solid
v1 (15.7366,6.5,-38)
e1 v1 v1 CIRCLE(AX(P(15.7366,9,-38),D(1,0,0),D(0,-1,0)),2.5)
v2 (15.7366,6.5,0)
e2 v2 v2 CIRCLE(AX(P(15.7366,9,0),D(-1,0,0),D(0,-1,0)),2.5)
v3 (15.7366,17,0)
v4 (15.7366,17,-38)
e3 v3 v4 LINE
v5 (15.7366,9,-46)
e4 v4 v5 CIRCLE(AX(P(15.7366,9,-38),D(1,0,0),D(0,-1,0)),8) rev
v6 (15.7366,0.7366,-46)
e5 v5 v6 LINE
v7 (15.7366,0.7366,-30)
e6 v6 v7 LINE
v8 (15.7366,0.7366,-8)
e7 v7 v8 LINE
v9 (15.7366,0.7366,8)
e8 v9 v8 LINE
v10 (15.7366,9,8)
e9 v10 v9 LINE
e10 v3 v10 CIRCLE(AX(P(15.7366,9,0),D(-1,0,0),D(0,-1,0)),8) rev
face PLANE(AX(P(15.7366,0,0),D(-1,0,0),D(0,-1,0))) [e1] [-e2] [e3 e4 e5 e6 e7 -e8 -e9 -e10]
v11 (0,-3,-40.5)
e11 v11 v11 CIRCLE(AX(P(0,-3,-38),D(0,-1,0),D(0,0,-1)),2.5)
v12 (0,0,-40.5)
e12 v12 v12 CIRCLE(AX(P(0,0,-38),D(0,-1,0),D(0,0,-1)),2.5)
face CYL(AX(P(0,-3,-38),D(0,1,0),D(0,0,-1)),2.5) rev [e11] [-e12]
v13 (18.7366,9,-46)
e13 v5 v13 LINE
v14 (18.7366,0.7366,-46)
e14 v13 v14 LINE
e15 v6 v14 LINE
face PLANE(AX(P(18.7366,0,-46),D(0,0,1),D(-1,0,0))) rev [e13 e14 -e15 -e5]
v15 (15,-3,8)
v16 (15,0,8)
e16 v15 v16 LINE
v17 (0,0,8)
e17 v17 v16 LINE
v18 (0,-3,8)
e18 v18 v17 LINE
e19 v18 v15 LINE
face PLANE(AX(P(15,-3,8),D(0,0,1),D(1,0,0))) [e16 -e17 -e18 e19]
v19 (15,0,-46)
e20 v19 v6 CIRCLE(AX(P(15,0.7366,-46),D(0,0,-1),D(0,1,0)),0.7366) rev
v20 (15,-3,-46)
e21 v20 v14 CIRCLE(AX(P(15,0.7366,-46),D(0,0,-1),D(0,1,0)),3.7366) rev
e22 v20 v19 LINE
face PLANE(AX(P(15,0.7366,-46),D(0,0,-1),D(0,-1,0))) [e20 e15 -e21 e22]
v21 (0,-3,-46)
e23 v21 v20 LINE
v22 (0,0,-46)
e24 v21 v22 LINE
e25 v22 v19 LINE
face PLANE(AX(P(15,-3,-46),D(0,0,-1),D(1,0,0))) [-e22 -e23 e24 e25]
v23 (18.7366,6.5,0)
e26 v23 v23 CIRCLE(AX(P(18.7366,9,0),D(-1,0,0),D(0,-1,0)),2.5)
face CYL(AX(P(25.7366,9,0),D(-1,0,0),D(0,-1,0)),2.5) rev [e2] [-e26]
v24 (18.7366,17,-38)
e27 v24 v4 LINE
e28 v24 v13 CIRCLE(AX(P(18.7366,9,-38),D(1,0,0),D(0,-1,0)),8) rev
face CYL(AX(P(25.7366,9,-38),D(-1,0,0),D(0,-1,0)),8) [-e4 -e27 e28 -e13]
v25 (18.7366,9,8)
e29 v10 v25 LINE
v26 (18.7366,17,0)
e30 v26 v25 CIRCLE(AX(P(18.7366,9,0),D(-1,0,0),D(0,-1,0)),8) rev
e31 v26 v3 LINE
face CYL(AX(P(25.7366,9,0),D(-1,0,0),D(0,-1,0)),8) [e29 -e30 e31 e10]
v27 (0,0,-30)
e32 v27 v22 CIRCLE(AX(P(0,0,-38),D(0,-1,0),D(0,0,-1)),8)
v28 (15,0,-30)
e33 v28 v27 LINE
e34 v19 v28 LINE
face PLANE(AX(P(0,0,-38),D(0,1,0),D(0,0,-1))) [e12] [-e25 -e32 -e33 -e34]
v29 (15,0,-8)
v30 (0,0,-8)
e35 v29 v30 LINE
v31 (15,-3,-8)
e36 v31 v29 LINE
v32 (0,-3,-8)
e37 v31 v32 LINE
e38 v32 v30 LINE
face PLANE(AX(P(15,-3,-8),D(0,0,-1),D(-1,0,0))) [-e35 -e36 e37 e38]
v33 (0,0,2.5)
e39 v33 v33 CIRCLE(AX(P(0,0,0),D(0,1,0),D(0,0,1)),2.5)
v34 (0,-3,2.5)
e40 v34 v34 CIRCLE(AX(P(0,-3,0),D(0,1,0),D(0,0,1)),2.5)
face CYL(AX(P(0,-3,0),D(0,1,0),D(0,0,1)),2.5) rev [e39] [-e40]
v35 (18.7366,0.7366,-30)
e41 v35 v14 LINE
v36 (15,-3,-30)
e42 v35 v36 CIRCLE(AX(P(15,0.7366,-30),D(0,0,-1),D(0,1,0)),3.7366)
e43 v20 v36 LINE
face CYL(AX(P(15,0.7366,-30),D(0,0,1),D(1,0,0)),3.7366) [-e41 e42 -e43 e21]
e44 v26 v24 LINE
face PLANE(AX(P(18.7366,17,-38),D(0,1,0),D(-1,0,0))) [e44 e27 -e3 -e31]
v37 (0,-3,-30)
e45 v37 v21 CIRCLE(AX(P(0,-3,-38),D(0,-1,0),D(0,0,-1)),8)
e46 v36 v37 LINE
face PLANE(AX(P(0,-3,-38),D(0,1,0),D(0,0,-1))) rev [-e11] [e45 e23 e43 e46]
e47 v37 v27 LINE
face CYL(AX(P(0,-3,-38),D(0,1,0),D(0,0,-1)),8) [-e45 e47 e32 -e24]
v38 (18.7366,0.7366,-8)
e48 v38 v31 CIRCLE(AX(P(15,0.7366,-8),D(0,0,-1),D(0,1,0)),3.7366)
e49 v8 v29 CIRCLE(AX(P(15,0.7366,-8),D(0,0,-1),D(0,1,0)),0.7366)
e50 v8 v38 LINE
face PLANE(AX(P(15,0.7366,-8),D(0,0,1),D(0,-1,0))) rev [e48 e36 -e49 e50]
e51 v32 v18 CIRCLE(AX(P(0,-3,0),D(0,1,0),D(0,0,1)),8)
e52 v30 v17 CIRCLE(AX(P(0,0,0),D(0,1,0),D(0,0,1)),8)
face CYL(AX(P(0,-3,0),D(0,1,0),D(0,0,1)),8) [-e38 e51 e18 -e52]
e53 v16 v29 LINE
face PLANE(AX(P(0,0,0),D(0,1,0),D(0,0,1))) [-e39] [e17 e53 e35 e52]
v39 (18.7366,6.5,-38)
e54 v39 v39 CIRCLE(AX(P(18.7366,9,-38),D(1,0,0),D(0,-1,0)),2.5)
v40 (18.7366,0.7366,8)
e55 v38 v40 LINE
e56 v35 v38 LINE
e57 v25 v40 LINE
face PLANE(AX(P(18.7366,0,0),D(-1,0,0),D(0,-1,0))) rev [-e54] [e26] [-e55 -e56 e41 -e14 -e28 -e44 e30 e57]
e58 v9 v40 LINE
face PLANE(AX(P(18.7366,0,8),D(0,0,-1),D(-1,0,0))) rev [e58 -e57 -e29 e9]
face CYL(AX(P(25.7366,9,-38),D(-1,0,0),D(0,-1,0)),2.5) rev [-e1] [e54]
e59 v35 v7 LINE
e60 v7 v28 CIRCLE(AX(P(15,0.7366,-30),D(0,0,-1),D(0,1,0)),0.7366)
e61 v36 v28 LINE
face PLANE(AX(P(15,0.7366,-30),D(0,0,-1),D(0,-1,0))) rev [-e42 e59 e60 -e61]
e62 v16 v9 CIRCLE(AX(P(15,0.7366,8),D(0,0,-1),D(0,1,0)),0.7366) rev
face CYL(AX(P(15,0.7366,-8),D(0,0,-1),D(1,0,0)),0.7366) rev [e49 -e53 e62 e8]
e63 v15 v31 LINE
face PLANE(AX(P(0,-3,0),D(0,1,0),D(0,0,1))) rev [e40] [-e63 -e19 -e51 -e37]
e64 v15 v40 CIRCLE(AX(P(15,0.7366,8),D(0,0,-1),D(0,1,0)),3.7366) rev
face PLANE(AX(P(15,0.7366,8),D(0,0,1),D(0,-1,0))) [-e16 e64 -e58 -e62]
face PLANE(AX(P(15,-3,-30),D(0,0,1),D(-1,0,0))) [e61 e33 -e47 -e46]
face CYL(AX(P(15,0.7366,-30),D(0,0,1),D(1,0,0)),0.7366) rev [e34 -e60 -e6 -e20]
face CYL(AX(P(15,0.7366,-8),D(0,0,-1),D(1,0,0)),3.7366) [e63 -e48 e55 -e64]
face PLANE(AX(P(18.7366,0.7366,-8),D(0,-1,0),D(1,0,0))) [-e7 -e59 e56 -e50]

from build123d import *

# Parameters (mm, degrees)
SKETCH1_R          = 2.5
BASE_FLANGE1_DEPTH = 3
EDGE_FLANGE1_DEPTH = 16
SKETCH10_R         = 2.5
CUT_EXTRUDE1_DEPTH = 10
TAB1_START         = -3
TAB1_DEPTH         = 3


# Read off the part's stored shape, not the designer's step: Tab1
# Sheet-metal steps are written as plain solids
with BuildPart() as part:
    # Sketch1 → Base-Flange1 (new body)
    with BuildSketch(Plane(origin=(0, 0, 0), x_dir=(1, 0, 0), z_dir=(0, 1, 0))):
        with BuildLine():
            Line((15, -8), (0, -8))
            ThreePointArc((0, -8), (-8, 0), (0, 8))
            Line((0, 8), (15, 8))
            Line((15, 8), (15, -8))
        make_face()
        with Locations(Location((0, 0, 0), (0, 0, 270))):
            Circle(SKETCH1_R, mode=Mode.SUBTRACT)
    extrude(amount=-BASE_FLANGE1_DEPTH)

    # Edge-Flange1 section (across the edge) → Edge-Flange1 (add)
    with BuildSketch(Plane(origin=(15.7366, 0, 8), x_dir=(-1, 0, 0), z_dir=(0, 0, -1))):
        with BuildLine():
            Line((-3, 0.7366), (-3, 17))
            Line((-3, 17), (0, 17))
            Line((0, 17), (0, 0.7366))
            ThreePointArc((0, 0.7366), (0.215745145, 0.215745145), (0.7366, 0))
            Line((0.7366, 0), (0.7366, -3))
            ThreePointArc((0.7366, -3), (-1.905575199, -1.905575199), (-3, 0.7366))
        make_face()
    extrude(amount=EDGE_FLANGE1_DEPTH)

    # Sketch10 → Cut-Extrude1 (cut)
    with BuildSketch(Plane.ZY.offset(-15.7366)):
        with BuildLine():
            Line((-8, 17), (-8, 9))
            ThreePointArc((-8, 9), (-5.656854249, 14.656854249), (0, 17))
            Line((0, 17), (-8, 17))
        make_face()
        with BuildLine():
            Line((8, 17), (0, 17))
            ThreePointArc((0, 17), (5.656854249, 14.656854249), (8, 9))
            Line((8, 9), (8, 17))
        make_face()
        with Locations(Location((0, 9, 0), (0, 0, 270))):
            Circle(SKETCH10_R)
    extrude(amount=-CUT_EXTRUDE1_DEPTH, mode=Mode.SUBTRACT)


with BuildPart() as body_2:
    # Mirror1: mirrored copy
    add(part.part.mirror(Plane.XY.offset(-19)))


with BuildPart() as part_1:
    add(part.part)

    add(body_2.part)  # Tab1 merges body 2
    # Tab1 outline → Tab1 (add)
    with BuildSketch(Plane.ZY.offset(-15.7366).offset(TAB1_START)):
        with BuildLine():
            ThreePointArc((-8, 9), (-5.656854249, 14.656854249), (0, 17))
            Line((0, 17), (-38, 17))
            ThreePointArc((-38, 17), (-32.343145751, 14.656854249), (-30, 9))
            Line((-30, 9), (-30, 0.7366))
            Line((-30, 0.7366), (-8, 0.7366))
            Line((-8, 0.7366), (-8, 9))
        make_face()
    extrude(amount=TAB1_DEPTH)


solid = part_1.part
